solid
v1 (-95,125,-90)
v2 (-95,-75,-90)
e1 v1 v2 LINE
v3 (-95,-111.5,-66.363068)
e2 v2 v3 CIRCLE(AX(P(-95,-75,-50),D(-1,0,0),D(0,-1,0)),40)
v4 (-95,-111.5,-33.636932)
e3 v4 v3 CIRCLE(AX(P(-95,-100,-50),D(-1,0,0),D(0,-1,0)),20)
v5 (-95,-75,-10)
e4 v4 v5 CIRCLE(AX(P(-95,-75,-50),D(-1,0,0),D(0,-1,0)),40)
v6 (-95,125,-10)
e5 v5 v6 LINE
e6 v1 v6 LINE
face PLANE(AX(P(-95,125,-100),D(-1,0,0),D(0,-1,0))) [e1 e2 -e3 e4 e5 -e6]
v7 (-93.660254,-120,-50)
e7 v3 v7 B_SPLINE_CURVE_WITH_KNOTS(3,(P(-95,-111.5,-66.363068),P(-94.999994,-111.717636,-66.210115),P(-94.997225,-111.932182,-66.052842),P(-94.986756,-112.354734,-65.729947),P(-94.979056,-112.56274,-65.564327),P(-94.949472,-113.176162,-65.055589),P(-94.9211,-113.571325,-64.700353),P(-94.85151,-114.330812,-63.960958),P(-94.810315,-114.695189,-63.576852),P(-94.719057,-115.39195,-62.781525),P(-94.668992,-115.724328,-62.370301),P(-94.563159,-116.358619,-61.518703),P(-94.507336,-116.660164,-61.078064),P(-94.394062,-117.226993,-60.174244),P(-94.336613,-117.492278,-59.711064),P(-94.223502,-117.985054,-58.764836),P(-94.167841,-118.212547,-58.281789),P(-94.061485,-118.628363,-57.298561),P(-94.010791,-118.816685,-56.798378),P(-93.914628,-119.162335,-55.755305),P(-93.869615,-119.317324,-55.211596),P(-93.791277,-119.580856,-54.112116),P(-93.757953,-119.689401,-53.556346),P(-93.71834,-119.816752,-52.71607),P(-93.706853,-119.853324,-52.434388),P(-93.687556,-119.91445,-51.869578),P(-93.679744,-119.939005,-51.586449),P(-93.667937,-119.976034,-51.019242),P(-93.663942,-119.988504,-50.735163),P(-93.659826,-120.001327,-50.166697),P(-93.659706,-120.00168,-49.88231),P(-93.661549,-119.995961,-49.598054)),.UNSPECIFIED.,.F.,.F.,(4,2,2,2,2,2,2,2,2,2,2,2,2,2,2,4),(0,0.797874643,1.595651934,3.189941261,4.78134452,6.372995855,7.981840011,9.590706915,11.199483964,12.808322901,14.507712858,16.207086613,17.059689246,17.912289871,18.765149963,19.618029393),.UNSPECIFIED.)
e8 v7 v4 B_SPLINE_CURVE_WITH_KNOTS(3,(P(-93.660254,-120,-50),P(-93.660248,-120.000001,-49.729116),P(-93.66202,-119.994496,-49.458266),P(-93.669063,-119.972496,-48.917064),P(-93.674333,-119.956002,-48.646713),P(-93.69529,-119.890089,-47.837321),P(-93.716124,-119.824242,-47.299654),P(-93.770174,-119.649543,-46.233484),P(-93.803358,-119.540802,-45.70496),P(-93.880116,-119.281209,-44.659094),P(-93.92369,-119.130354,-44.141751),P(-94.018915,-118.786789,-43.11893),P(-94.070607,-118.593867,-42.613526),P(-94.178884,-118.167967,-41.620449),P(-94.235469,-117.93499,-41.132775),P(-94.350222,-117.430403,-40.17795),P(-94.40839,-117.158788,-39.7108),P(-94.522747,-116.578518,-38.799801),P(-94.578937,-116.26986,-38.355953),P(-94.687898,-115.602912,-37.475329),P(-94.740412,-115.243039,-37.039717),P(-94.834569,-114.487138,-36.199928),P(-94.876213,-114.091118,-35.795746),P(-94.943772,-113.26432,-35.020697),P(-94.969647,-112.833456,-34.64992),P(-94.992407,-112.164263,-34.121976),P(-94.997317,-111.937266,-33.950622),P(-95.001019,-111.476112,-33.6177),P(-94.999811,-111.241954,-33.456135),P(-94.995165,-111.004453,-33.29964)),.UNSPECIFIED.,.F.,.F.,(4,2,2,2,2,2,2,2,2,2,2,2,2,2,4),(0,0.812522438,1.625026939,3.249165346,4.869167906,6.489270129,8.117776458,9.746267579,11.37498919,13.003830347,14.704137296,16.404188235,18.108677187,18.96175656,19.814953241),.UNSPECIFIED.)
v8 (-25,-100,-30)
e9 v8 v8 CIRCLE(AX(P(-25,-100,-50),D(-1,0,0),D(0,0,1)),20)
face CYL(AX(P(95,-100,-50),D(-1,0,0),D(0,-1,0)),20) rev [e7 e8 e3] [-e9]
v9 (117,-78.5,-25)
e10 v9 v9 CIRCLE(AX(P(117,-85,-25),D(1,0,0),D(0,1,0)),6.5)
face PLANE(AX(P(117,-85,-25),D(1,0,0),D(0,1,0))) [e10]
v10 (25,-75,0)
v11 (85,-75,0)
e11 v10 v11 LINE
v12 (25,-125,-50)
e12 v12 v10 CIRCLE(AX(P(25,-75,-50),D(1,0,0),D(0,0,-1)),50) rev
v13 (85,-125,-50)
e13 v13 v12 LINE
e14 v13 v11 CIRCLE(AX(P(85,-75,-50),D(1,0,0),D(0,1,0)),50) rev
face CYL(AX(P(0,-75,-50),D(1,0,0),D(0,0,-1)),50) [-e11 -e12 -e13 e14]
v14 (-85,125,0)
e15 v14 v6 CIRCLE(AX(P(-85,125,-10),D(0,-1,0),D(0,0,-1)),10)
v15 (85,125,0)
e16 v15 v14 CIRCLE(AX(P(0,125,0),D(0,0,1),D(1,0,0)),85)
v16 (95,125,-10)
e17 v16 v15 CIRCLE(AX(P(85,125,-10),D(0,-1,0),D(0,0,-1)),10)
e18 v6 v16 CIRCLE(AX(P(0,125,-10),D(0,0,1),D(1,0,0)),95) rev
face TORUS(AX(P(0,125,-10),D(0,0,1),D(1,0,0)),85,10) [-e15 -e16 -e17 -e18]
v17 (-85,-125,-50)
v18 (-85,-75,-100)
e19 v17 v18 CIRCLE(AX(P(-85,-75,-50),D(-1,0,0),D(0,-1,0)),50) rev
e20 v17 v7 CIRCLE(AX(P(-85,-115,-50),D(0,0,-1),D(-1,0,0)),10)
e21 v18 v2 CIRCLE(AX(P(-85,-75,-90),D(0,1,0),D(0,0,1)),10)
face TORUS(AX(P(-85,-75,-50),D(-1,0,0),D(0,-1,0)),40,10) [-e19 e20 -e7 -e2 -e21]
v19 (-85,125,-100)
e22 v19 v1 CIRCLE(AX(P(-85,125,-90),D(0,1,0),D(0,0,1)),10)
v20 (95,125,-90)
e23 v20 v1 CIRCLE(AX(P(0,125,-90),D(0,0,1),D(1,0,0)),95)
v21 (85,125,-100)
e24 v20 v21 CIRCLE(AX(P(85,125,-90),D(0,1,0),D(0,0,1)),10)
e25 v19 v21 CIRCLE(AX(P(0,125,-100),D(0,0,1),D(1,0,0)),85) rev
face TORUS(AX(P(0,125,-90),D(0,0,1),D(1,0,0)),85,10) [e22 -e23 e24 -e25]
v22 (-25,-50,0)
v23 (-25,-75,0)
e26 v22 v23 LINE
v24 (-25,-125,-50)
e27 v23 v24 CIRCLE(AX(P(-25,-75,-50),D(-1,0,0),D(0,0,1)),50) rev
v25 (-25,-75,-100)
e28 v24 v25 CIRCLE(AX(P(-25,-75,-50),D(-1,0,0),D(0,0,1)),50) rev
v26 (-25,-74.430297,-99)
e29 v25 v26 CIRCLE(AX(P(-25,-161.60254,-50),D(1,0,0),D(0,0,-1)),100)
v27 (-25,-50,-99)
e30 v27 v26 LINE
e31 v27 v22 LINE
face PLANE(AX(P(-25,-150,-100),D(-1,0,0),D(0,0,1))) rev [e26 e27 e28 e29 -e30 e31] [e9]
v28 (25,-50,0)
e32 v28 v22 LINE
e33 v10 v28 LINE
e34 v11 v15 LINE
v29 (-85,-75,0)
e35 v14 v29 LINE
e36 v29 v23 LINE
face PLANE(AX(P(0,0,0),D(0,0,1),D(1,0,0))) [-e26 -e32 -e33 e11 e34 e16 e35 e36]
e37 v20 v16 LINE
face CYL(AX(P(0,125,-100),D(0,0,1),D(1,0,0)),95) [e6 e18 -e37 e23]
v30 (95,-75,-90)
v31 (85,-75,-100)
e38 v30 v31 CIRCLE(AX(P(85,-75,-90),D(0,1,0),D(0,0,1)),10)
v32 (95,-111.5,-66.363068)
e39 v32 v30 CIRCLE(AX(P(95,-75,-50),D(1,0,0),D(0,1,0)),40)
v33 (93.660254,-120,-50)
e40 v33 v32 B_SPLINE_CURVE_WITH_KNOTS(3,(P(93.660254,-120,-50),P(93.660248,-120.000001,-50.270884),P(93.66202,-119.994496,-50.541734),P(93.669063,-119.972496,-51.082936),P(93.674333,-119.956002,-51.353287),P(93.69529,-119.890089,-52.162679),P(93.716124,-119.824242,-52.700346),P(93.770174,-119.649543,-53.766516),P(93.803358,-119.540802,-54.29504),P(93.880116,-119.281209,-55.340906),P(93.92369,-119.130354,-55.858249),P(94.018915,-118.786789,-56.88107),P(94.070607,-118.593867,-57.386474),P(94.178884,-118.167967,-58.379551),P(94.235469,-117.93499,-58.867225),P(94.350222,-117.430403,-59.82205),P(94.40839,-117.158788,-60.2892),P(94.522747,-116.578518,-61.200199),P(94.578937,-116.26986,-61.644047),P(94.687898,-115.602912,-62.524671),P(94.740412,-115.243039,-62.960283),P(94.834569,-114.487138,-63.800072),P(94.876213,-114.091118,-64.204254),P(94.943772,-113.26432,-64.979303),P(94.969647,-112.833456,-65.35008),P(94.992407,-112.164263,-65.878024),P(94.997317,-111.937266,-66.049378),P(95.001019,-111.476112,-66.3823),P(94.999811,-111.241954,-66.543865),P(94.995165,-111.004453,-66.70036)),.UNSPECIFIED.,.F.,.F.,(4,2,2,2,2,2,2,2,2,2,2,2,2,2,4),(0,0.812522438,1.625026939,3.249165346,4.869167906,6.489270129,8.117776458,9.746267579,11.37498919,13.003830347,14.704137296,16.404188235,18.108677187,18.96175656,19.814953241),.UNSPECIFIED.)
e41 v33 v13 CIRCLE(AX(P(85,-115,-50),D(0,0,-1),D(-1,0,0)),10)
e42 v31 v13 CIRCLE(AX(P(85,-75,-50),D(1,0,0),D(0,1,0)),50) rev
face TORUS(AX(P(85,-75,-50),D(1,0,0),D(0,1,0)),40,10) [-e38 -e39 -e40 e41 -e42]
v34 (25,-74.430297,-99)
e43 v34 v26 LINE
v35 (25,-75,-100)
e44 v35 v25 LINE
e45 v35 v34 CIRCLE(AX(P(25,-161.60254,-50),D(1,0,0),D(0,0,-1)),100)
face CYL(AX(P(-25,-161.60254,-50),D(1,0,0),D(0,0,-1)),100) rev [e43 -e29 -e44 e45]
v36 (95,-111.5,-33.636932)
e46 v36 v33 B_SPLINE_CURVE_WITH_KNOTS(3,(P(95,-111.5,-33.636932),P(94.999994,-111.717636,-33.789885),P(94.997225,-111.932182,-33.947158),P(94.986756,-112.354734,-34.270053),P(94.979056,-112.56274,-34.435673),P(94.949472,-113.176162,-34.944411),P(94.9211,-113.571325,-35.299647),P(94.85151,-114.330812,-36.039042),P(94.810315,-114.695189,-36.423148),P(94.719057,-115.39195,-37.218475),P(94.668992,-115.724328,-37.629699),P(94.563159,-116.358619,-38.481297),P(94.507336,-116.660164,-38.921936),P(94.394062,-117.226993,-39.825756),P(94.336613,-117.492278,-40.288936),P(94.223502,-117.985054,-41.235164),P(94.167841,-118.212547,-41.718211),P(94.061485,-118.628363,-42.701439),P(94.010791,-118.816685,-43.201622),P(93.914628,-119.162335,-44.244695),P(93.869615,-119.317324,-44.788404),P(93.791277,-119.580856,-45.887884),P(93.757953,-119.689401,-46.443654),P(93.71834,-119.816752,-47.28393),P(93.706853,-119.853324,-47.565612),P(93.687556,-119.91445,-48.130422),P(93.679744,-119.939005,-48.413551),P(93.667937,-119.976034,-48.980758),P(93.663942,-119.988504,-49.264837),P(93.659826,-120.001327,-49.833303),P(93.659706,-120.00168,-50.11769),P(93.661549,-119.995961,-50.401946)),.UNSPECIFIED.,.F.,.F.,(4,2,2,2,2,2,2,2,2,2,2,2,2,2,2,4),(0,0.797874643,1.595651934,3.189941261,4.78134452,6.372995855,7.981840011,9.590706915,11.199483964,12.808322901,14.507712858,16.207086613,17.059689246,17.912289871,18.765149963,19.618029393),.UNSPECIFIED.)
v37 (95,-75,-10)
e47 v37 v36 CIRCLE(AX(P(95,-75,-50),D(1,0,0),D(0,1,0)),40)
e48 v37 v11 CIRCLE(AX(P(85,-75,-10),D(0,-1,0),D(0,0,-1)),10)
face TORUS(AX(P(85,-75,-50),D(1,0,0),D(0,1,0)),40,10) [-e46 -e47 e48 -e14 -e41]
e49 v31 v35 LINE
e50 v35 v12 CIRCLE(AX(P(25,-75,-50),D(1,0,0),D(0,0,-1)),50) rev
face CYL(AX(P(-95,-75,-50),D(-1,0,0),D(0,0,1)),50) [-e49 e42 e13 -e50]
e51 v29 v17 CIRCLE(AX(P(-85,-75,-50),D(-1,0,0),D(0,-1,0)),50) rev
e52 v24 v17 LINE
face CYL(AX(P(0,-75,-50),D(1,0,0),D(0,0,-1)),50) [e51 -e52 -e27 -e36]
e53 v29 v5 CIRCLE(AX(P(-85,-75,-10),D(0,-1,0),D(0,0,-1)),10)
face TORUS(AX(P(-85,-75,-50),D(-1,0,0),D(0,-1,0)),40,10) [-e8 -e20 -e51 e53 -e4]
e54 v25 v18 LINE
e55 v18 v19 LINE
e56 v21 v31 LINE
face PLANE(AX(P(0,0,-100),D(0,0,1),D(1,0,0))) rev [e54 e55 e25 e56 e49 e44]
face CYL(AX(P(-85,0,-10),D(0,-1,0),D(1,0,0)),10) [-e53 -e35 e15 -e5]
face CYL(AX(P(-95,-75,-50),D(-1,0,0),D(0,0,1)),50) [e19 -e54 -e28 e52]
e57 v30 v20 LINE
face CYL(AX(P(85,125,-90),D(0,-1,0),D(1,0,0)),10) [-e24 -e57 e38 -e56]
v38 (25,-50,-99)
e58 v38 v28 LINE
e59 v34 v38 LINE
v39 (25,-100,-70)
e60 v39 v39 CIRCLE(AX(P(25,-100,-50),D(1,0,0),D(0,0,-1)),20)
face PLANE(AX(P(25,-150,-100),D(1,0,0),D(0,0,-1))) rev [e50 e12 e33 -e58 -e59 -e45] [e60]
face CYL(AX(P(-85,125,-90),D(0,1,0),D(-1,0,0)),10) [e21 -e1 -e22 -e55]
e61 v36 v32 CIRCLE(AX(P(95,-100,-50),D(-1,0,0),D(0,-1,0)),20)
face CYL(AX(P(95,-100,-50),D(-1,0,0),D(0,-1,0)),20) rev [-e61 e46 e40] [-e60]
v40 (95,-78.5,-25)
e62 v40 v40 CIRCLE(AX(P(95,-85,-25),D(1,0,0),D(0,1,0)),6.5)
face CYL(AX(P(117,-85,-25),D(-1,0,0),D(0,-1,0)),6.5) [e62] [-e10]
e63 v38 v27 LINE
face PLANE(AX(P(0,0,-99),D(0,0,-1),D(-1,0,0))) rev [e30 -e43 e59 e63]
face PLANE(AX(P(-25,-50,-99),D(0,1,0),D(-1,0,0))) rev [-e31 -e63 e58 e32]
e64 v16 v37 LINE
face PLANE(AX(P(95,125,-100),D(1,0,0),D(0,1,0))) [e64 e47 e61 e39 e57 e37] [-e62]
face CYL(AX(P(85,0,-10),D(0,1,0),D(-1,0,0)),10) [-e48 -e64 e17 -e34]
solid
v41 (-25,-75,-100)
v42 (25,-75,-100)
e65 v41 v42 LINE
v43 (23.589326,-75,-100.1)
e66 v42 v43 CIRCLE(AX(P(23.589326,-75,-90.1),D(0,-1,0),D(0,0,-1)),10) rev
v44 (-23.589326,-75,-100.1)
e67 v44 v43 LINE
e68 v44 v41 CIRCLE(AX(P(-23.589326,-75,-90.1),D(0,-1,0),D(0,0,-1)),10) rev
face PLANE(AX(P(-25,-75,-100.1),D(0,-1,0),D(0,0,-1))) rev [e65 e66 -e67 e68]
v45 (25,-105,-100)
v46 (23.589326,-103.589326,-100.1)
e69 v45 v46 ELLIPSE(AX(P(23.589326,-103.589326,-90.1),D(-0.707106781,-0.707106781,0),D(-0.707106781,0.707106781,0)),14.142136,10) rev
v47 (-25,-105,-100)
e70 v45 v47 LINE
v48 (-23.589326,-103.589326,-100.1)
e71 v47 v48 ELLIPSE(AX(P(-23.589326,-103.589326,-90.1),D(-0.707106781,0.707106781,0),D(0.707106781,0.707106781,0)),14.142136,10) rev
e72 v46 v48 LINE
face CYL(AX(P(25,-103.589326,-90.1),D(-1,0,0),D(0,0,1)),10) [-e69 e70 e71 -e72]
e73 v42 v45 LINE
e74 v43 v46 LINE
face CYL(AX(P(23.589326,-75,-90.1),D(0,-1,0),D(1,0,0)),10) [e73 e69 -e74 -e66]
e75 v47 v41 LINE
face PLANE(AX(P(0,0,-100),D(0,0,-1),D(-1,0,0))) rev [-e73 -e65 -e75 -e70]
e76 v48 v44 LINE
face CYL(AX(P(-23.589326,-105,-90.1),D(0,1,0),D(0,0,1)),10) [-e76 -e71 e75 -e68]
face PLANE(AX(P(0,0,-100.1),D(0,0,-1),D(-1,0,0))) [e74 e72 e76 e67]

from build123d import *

# Parameters (mm, degrees)
BOSS_EXTRUDE1_DEPTH    = 100
SKETCH2_W              = 50
SKETCH2_H              = 50
CUT_EXTRUDE1_DEPTH     = 187.14510469
CUT_EXTRUDE2_DEPTH     = 25
SKETCH7_R              = 20
CUT_EXTRUDE3_DEPTH     = 249.445164976
FILLET2_R              = 50
CUT_EXTRUDE6_START     = -125
CUT_EXTRUDE6_OUTLINE_W = 50
CUT_EXTRUDE6_OUTLINE_H = 6.698729811
CUT_EXTRUDE6_DEPTH     = 50
CUT_EXTRUDE7_DEPTH     = 25
BOSS_EXTRUDE2_DEPTH    = 100
FILLET4_R              = 10
SKETCH11_W             = 50
SKETCH11_H             = 25
CUT_EXTRUDE11_DEPTH    = 99
SKETCH16_W             = 50
SKETCH16_H             = 30
BOSS_EXTRUDE3_DEPTH    = 0.1
FILLET5_R              = 10
SKETCH17_R             = 6.5
BOSS_EXTRUDE4_DEPTH    = 22


with BuildPart() as part:
    # Sketch1 → Boss-Extrude1 (new body)
    with BuildSketch(Plane.XY):
        Polygon((-95, 125), (20.2, 125), (69.8, 125), (95, 125), (95, -125), (-95, -125), align=None)
    extrude(amount=-BOSS_EXTRUDE1_DEPTH)

    # Sketch2 → Cut-Extrude1 (cut, through all)
    with BuildSketch(Plane.XY):
        with Locations((0, -125)):
            Rectangle(SKETCH2_W, SKETCH2_H)
    extrude(amount=-CUT_EXTRUDE1_DEPTH, mode=Mode.SUBTRACT)

    # Sketch6 → Cut-Extrude2 (cut, symmetric)
    with BuildSketch(Plane(origin=(0, 0, 0), x_dir=(0, 0, -1), z_dir=(1, 0, 0))):
        with BuildLine():
            Line((100, -100), (0, -100))
            ThreePointArc((0, -100), (50, -50), (100, -100))
        make_face()
    extrude(amount=CUT_EXTRUDE2_DEPTH, both=True, mode=Mode.SUBTRACT)

    # Sketch7 → Cut-Extrude3 (cut, through all)
    with BuildSketch(Plane.ZY.offset(95)):
        with Locations(Location((-50, -100, 0), (0, 0, 270))):
            Circle(SKETCH7_R)
    extrude(amount=-CUT_EXTRUDE3_DEPTH, mode=Mode.SUBTRACT)

    # Fillet2
    fillet2_edges = [part.edges().sort_by_distance(p)[0] for p in [
        (-60, -125, -100),
        (-60, -125, 0),
    ]]
    fillet(fillet2_edges, radius=FILLET2_R - 0.0001)  # a hair under: the kernel refuses the full size

    # Cut-Extrude6: read off the stored shape, not the designer's step
    # Cut-Extrude6 outline → Cut-Extrude6 (cut)
    with BuildSketch(Plane(origin=(0, 0, 0), x_dir=(1, 0, 0), z_dir=(0, 1, 0)).offset(CUT_EXTRUDE6_START)):
        with Locations((0, 96.650635095)):
            Rectangle(CUT_EXTRUDE6_OUTLINE_W, CUT_EXTRUDE6_OUTLINE_H)
        with Locations((0, 3.349364906)):
            Rectangle(CUT_EXTRUDE6_OUTLINE_W, CUT_EXTRUDE6_OUTLINE_H)
    extrude(amount=CUT_EXTRUDE6_DEPTH, mode=Mode.SUBTRACT)

    # Sketch10 → Cut-Extrude7 (cut, symmetric)
    with BuildSketch(Plane(origin=(0, 0, 0), x_dir=(0, 0, -1), z_dir=(1, 0, 0))):
        with BuildLine():
            Line((0, -75), (100, -75))
            ThreePointArc((100, -75), (50, -61.602540378), (0, -75))
        make_face()
    extrude(amount=CUT_EXTRUDE7_DEPTH, both=True, mode=Mode.SUBTRACT)

    # Sketch15 → Boss-Extrude2 (add)
    with BuildSketch(Plane.XY):
        with BuildLine():
            Line((-95, 125), (95, 125))
            ThreePointArc((95, 125), (0, 220), (-95, 125))
        make_face()
    extrude(amount=-BOSS_EXTRUDE2_DEPTH)

    # Fillet4
    # the kernel refuses this fillet: 10 mm, written as the material it takes off along each edge
    with BuildSketch(Plane(origin=(0, 125, -100), x_dir=(1, 0, 0), z_dir=(0, -1, 0))) as fillet4_piece_1:
        with BuildLine():
            CenterArc((95 - FILLET4_R, FILLET4_R), FILLET4_R, 270, 90)
            Line((95, FILLET4_R), (95, 0))
            Line((95, 0), (95 - FILLET4_R, 0))
        make_face()
    revolve(axis=Axis((0, 125, -100), (0, 0, 1)), revolution_arc=180, mode=Mode.SUBTRACT)
    with BuildSketch(Plane(origin=(0, 125, 0), x_dir=(1, 0, 0), z_dir=(0, -1, 0))) as fillet4_piece_2:
        with BuildLine():
            CenterArc((95 - FILLET4_R, -FILLET4_R), FILLET4_R, 0, 90)
            Line((95, -FILLET4_R), (95, 0))
            Line((95, 0), (95 - FILLET4_R, 0))
        make_face()
    revolve(axis=Axis((0, 125, 0), (0, 0, 1)), revolution_arc=180, mode=Mode.SUBTRACT)
    with BuildSketch(Plane(origin=(-95, -75.0001, -100), x_dir=(0, 0, 1), z_dir=(0, 1, 0)), Plane(origin=(95, 125, 0), x_dir=(-1, 0, 0), z_dir=(0, -1, 0))) as fillet4_piece_3:
        with BuildLine():
            CenterArc((FILLET4_R, FILLET4_R), FILLET4_R, 180, 90)
            Line((0, FILLET4_R), (0, 0))
            Line((0, 0), (FILLET4_R, 0))
        make_face()
    extrude(amount=200.0001, mode=Mode.SUBTRACT)
    with BuildSketch(Plane(origin=(95, 125, -100), x_dir=(-1, 0, 0), z_dir=(0, -1, 0)), Plane(origin=(-95, -75.0001, 0), x_dir=(0, 0, -1), z_dir=(0, 1, 0))) as fillet4_piece_4:
        with BuildLine():
            CenterArc((FILLET4_R, -FILLET4_R), FILLET4_R, 90, 90)
            Line((0, -FILLET4_R), (0, 0))
            Line((0, 0), (FILLET4_R, 0))
        make_face()
    extrude(amount=200.0001, mode=Mode.SUBTRACT)
    with BuildSketch(Plane(origin=(95, -75.0001, -49.9999), x_dir=(0, 0, 1), z_dir=(0, 1, 0))) as fillet4_piece_5:
        with BuildLine():
            CenterArc((49.9999 - FILLET4_R, -FILLET4_R), FILLET4_R, 0, 90)
            Line((49.9999 - FILLET4_R, 0), (49.9999, 0))
            Line((49.9999, 0), (49.9999, -FILLET4_R))
        make_face()
    revolve(axis=Axis((95, -75.0001, -49.9999), (1, 0, 0)), revolution_arc=90, mode=Mode.SUBTRACT)
    with BuildSketch(Plane(origin=(95, -75.0001, -50.0001), x_dir=(0, 0, -1), z_dir=(0, 1, 0))) as fillet4_piece_6:
        with BuildLine():
            CenterArc((49.9999 - FILLET4_R, FILLET4_R), FILLET4_R, 270, 90)
            Line((49.9999, FILLET4_R), (49.9999, 0))
            Line((49.9999, 0), (49.9999 - FILLET4_R, 0))
        make_face()
    revolve(axis=Axis((95, -75.0001, -50.0001), (-1, 0, 0)), revolution_arc=90, mode=Mode.SUBTRACT)
    with BuildSketch(Plane(origin=(-95, -75.0001, -49.9999), x_dir=(0, 0, 1), z_dir=(0, 1, 0))) as fillet4_piece_7:
        with BuildLine():
            CenterArc((49.9999 - FILLET4_R, FILLET4_R), FILLET4_R, 270, 90)
            Line((49.9999, FILLET4_R), (49.9999, 0))
            Line((49.9999, 0), (49.9999 - FILLET4_R, 0))
        make_face()
    revolve(axis=Axis((-95, -75.0001, -49.9999), (1, 0, 0)), revolution_arc=90, mode=Mode.SUBTRACT)
    with BuildSketch(Plane(origin=(-95, -75.0001, -50.0001), x_dir=(0, 0, -1), z_dir=(0, 1, 0))) as fillet4_piece_8:
        with BuildLine():
            CenterArc((49.9999 - FILLET4_R, -FILLET4_R), FILLET4_R, 0, 90)
            Line((49.9999, -FILLET4_R), (49.9999, 0))
            Line((49.9999, 0), (49.9999 - FILLET4_R, 0))
        make_face()
    revolve(axis=Axis((-95, -75.0001, -50.0001), (-1, 0, 0)), revolution_arc=90, mode=Mode.SUBTRACT)
    with BuildSketch(Plane(origin=(-95, -125, -49.9999), x_dir=(0, 1, 0), z_dir=(0, 0, -1))) as fillet4_piece_9:
        with BuildLine():
            CenterArc((FILLET4_R, FILLET4_R), FILLET4_R, 180, 90)
            Line((0, FILLET4_R), (0, 0))
            Line((0, 0), (FILLET4_R, 0))
        make_face()
    extrude(amount=0.0002, mode=Mode.SUBTRACT)
    with BuildSketch(Plane(origin=(95, -125, -49.9999), x_dir=(0, 1, 0), z_dir=(0, 0, -1))) as fillet4_piece_10:
        with BuildLine():
            CenterArc((FILLET4_R, -FILLET4_R), FILLET4_R, 90, 90)
            Line((0, -FILLET4_R), (0, 0))
            Line((0, 0), (FILLET4_R, 0))
        make_face()
    extrude(amount=0.0002, mode=Mode.SUBTRACT)

    # Sketch11 → Cut-Extrude11 (cut)
    with BuildSketch(Plane.XY):
        with Locations((0, -62.5)):
            Rectangle(SKETCH11_W, SKETCH11_H)
    extrude(amount=-CUT_EXTRUDE11_DEPTH, mode=Mode.SUBTRACT)

    # Sketch17 → Boss-Extrude4 (add)
    with BuildSketch(Plane(origin=(95, 0, 0), x_dir=(0, 0, -1), z_dir=(1, 0, 0))):
        with Locations(Location((25, -85, 0), (0, 0, 90))):
            Circle(SKETCH17_R)
    extrude(amount=BOSS_EXTRUDE4_DEPTH)


with BuildPart() as body_2:
    # Sketch16 → Boss-Extrude3 (new body)
    with BuildSketch(Plane(origin=(0, 0, -100), x_dir=(-1, 0, 0), z_dir=(0, 0, -1))):
        with Locations((0, -90)):
            Rectangle(SKETCH16_W, SKETCH16_H)
    extrude(amount=BOSS_EXTRUDE3_DEPTH)

    # Fillet5
    # the kernel refuses this fillet: 10 mm, written as the material it takes off along each edge
    with BuildSketch(Plane(origin=(25, -71.473316005, -100.1), x_dir=(0, 0, 1), z_dir=(0, -1, 0)), Plane(origin=(-25, -108.526683995, -100.1), x_dir=(0, 0, 1), z_dir=(0, 1, 0))) as fillet5_piece_1:
        with BuildLine():
            CenterArc((10, 1.410673598), FILLET5_R, 180, 8.109614456)
            Line((0, 1.410673598), (0, 0))
            Line((0, 0), (0.1, 0))
        make_face()
    extrude(amount=37.05336799, mode=Mode.SUBTRACT)
    with BuildSketch(Plane(origin=(28.526683995, -105, -100.1), x_dir=(0, 0, 1), z_dir=(-1, 0, 0))) as fillet5_piece_2:
        with BuildLine():
            CenterArc((10, 1.410673598), FILLET5_R, 180, 8.109614456)
            Line((0, 1.410673598), (0, 0))
            Line((0, 0), (0.1, 0))
        make_face()
    extrude(amount=57.05336799, mode=Mode.SUBTRACT)


solid = Compound([part.part, body_2.part])
